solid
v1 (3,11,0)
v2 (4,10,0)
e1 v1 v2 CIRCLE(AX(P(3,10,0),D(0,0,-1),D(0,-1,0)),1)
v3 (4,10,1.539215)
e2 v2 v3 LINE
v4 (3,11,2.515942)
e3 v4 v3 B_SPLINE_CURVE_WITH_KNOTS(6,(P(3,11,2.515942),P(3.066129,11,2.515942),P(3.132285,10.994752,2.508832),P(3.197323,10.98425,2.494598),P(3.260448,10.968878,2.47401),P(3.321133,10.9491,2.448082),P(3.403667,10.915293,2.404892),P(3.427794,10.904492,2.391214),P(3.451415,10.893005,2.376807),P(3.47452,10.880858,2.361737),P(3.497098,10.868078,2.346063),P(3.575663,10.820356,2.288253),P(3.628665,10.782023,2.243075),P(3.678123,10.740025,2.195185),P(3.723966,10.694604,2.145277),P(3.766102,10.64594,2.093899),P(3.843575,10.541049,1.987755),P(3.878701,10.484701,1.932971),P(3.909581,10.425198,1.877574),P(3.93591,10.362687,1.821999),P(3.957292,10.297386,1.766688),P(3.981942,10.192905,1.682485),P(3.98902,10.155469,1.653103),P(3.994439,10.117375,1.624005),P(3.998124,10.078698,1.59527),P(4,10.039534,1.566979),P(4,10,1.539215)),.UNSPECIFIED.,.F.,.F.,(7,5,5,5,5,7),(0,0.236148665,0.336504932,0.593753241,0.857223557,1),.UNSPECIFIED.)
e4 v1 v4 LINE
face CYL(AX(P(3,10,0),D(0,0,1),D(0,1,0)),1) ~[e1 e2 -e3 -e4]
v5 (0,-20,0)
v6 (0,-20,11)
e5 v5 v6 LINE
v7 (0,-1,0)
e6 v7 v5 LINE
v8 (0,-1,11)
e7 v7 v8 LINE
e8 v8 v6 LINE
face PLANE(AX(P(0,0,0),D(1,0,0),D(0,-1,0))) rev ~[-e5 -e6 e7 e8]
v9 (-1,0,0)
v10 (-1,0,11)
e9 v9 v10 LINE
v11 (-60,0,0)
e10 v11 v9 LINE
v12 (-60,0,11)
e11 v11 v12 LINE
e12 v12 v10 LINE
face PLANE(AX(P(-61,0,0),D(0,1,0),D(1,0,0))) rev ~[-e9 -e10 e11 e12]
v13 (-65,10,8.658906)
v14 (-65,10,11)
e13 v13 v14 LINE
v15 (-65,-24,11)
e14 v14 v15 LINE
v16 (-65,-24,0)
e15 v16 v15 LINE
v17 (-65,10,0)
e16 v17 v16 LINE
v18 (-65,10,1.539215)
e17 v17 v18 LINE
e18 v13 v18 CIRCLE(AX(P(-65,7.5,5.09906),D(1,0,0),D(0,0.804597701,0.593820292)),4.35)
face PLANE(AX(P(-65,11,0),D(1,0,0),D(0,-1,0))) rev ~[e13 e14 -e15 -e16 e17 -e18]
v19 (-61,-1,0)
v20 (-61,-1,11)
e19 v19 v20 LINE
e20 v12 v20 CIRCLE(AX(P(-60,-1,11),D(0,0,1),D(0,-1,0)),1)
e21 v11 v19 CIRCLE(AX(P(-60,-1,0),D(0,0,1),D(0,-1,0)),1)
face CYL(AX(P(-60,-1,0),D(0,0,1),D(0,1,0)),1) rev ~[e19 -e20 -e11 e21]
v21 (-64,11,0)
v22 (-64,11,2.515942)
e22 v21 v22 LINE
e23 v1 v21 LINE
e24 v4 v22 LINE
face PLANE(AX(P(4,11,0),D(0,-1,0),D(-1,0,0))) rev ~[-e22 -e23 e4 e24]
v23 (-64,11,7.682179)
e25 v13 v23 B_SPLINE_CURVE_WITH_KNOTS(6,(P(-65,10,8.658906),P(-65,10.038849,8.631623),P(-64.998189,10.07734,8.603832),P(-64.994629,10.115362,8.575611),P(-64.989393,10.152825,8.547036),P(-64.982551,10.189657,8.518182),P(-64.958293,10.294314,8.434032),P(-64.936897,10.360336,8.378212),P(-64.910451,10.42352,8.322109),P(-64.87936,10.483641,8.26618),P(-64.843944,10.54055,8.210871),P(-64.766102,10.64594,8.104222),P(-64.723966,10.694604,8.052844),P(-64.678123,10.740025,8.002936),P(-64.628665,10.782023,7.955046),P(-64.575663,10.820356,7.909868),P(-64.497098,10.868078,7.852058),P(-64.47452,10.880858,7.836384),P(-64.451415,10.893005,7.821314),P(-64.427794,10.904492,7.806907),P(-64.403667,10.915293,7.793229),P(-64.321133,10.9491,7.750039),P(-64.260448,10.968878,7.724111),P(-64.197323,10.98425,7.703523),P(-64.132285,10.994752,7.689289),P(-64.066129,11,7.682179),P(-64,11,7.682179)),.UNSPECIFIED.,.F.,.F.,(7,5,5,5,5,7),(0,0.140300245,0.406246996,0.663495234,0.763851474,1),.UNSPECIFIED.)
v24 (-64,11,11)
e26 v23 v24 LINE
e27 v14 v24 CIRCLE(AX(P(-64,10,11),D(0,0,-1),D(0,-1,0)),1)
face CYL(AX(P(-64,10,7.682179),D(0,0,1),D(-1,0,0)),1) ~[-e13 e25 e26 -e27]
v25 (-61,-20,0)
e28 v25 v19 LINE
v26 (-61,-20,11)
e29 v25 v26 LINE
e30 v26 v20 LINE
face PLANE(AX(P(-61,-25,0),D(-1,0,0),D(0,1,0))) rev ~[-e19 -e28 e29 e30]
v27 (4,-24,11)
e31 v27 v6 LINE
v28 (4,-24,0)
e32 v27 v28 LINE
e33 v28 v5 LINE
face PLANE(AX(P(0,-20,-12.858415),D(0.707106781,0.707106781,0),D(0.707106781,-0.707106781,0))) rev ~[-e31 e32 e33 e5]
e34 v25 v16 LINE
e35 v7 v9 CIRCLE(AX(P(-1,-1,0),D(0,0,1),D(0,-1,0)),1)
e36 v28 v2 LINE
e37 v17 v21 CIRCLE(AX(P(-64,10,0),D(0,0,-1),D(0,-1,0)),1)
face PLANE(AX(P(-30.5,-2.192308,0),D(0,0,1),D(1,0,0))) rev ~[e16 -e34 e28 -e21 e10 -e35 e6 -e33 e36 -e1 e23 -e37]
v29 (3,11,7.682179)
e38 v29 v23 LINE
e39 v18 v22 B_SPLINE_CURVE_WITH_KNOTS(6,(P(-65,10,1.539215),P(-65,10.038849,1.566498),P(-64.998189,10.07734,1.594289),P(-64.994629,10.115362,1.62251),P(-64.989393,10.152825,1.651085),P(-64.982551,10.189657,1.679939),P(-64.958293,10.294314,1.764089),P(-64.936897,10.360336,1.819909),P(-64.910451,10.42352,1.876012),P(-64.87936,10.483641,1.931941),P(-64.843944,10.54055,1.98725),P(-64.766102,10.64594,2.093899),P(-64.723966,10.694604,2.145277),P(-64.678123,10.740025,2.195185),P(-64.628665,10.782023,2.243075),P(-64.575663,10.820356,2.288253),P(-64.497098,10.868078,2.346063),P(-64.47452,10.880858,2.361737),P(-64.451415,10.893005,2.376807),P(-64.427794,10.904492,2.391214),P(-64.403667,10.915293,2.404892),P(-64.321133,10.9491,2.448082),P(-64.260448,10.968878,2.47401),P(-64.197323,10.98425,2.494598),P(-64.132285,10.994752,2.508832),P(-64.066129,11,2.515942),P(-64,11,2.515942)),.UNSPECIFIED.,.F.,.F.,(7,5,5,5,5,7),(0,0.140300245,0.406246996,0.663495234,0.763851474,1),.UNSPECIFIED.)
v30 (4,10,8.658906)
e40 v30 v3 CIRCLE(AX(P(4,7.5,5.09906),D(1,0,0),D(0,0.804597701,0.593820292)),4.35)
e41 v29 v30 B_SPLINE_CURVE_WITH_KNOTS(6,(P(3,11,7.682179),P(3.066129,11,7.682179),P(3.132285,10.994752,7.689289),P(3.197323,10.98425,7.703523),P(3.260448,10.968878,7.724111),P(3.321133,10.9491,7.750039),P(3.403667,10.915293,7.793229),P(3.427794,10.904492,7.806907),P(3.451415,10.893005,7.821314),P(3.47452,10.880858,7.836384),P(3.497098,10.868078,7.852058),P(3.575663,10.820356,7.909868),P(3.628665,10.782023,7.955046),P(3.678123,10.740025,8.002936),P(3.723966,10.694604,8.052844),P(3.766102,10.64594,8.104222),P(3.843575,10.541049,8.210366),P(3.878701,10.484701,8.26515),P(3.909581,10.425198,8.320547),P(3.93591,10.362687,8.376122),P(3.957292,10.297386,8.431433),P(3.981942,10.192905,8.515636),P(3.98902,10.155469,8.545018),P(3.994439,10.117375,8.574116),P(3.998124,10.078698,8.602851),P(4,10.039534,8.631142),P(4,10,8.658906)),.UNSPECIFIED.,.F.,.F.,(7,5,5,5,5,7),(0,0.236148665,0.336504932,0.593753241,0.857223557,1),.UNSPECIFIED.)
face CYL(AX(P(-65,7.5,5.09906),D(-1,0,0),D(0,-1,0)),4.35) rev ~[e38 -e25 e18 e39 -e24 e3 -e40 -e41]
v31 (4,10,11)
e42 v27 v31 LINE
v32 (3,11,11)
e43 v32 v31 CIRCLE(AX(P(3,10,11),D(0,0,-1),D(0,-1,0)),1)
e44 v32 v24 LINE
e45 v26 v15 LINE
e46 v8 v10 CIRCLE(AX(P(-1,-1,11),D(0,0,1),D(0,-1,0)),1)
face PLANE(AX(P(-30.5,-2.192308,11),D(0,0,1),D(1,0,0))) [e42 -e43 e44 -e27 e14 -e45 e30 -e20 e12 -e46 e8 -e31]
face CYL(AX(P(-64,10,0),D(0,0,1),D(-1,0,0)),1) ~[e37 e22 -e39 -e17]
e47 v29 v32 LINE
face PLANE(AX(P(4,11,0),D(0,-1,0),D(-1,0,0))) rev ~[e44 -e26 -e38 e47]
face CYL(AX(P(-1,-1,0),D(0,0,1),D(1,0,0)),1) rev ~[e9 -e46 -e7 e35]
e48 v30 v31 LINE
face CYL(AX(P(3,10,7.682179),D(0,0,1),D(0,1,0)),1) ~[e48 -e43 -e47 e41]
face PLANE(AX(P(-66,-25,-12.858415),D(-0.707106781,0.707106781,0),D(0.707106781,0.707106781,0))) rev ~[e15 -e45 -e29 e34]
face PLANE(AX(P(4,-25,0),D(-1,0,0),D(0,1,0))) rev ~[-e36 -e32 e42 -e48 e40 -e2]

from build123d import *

# Parameters (mm, degrees)
F1_DEPTH    = 11
F2_T1_DEPTH = 36.7168298797
F3_R        = 4.35
F4_DEPTH    = 69.001
F5_T1_DEPTH = 36.7168298797
F6_R        = 1


# Not quite as in the source:
# - a fillet or chamfer that OpenCascade refuses, or shapes differently, is made with other operations: its cross-section is extruded or revolved along the edge and cut away or added


with BuildPart() as f1:
    # F0 (on Top) → F1 (new body)
    with BuildSketch(Plane.XY):
        Polygon((-65, -25), (-61, -25), (-61, 0), (0, 0), (0, -25), (4, -25), (4, 11), (-65, 11), align=None)
    extrude(amount=F1_DEPTH)

    # F2: chamfer of 5 on 1 edges, made by hand

    # F2_s2 → F2_t1 (cut)
    with BuildSketch(Plane.XY.offset(-12.8584149398)):
        Polygon((0, -20), (5, -25), (0, -25), align=None)
    extrude(amount=F2_T1_DEPTH, mode=Mode.SUBTRACT)

    # F3 (on face) → F4 (cut, through all)
    with BuildSketch(Plane(origin=(-65, 0, 0), x_dir=(0, -1, 0), z_dir=(-1, 0, 0))):
        with Locations((-7.5, 5.0990604796)):
            Circle(F3_R)
    extrude(amount=-F4_DEPTH, mode=Mode.SUBTRACT)

    # F5: chamfer of 5 on 1 edges, made by hand

    # F5_s2 → F5_t1 (cut)
    with BuildSketch(Plane.XY.offset(-12.8584149398)):
        Polygon((-66, -25), (-61, -20), (-61, -25), align=None)
    extrude(amount=F5_T1_DEPTH, mode=Mode.SUBTRACT)

    # F6
    f6_edges = [f1.edges().sort_by_distance(p)[0] for p in [
        (-61, 0, 5.5),
        (0, 0, 5.5),
        (4, 11, 9.341089),
        (4, 11, 1.257971),
        (-65, 11, 9.341089),
        (-65, 11, 1.257971),
    ]]
    fillet(f6_edges, radius=F6_R)


solid = f1.part
